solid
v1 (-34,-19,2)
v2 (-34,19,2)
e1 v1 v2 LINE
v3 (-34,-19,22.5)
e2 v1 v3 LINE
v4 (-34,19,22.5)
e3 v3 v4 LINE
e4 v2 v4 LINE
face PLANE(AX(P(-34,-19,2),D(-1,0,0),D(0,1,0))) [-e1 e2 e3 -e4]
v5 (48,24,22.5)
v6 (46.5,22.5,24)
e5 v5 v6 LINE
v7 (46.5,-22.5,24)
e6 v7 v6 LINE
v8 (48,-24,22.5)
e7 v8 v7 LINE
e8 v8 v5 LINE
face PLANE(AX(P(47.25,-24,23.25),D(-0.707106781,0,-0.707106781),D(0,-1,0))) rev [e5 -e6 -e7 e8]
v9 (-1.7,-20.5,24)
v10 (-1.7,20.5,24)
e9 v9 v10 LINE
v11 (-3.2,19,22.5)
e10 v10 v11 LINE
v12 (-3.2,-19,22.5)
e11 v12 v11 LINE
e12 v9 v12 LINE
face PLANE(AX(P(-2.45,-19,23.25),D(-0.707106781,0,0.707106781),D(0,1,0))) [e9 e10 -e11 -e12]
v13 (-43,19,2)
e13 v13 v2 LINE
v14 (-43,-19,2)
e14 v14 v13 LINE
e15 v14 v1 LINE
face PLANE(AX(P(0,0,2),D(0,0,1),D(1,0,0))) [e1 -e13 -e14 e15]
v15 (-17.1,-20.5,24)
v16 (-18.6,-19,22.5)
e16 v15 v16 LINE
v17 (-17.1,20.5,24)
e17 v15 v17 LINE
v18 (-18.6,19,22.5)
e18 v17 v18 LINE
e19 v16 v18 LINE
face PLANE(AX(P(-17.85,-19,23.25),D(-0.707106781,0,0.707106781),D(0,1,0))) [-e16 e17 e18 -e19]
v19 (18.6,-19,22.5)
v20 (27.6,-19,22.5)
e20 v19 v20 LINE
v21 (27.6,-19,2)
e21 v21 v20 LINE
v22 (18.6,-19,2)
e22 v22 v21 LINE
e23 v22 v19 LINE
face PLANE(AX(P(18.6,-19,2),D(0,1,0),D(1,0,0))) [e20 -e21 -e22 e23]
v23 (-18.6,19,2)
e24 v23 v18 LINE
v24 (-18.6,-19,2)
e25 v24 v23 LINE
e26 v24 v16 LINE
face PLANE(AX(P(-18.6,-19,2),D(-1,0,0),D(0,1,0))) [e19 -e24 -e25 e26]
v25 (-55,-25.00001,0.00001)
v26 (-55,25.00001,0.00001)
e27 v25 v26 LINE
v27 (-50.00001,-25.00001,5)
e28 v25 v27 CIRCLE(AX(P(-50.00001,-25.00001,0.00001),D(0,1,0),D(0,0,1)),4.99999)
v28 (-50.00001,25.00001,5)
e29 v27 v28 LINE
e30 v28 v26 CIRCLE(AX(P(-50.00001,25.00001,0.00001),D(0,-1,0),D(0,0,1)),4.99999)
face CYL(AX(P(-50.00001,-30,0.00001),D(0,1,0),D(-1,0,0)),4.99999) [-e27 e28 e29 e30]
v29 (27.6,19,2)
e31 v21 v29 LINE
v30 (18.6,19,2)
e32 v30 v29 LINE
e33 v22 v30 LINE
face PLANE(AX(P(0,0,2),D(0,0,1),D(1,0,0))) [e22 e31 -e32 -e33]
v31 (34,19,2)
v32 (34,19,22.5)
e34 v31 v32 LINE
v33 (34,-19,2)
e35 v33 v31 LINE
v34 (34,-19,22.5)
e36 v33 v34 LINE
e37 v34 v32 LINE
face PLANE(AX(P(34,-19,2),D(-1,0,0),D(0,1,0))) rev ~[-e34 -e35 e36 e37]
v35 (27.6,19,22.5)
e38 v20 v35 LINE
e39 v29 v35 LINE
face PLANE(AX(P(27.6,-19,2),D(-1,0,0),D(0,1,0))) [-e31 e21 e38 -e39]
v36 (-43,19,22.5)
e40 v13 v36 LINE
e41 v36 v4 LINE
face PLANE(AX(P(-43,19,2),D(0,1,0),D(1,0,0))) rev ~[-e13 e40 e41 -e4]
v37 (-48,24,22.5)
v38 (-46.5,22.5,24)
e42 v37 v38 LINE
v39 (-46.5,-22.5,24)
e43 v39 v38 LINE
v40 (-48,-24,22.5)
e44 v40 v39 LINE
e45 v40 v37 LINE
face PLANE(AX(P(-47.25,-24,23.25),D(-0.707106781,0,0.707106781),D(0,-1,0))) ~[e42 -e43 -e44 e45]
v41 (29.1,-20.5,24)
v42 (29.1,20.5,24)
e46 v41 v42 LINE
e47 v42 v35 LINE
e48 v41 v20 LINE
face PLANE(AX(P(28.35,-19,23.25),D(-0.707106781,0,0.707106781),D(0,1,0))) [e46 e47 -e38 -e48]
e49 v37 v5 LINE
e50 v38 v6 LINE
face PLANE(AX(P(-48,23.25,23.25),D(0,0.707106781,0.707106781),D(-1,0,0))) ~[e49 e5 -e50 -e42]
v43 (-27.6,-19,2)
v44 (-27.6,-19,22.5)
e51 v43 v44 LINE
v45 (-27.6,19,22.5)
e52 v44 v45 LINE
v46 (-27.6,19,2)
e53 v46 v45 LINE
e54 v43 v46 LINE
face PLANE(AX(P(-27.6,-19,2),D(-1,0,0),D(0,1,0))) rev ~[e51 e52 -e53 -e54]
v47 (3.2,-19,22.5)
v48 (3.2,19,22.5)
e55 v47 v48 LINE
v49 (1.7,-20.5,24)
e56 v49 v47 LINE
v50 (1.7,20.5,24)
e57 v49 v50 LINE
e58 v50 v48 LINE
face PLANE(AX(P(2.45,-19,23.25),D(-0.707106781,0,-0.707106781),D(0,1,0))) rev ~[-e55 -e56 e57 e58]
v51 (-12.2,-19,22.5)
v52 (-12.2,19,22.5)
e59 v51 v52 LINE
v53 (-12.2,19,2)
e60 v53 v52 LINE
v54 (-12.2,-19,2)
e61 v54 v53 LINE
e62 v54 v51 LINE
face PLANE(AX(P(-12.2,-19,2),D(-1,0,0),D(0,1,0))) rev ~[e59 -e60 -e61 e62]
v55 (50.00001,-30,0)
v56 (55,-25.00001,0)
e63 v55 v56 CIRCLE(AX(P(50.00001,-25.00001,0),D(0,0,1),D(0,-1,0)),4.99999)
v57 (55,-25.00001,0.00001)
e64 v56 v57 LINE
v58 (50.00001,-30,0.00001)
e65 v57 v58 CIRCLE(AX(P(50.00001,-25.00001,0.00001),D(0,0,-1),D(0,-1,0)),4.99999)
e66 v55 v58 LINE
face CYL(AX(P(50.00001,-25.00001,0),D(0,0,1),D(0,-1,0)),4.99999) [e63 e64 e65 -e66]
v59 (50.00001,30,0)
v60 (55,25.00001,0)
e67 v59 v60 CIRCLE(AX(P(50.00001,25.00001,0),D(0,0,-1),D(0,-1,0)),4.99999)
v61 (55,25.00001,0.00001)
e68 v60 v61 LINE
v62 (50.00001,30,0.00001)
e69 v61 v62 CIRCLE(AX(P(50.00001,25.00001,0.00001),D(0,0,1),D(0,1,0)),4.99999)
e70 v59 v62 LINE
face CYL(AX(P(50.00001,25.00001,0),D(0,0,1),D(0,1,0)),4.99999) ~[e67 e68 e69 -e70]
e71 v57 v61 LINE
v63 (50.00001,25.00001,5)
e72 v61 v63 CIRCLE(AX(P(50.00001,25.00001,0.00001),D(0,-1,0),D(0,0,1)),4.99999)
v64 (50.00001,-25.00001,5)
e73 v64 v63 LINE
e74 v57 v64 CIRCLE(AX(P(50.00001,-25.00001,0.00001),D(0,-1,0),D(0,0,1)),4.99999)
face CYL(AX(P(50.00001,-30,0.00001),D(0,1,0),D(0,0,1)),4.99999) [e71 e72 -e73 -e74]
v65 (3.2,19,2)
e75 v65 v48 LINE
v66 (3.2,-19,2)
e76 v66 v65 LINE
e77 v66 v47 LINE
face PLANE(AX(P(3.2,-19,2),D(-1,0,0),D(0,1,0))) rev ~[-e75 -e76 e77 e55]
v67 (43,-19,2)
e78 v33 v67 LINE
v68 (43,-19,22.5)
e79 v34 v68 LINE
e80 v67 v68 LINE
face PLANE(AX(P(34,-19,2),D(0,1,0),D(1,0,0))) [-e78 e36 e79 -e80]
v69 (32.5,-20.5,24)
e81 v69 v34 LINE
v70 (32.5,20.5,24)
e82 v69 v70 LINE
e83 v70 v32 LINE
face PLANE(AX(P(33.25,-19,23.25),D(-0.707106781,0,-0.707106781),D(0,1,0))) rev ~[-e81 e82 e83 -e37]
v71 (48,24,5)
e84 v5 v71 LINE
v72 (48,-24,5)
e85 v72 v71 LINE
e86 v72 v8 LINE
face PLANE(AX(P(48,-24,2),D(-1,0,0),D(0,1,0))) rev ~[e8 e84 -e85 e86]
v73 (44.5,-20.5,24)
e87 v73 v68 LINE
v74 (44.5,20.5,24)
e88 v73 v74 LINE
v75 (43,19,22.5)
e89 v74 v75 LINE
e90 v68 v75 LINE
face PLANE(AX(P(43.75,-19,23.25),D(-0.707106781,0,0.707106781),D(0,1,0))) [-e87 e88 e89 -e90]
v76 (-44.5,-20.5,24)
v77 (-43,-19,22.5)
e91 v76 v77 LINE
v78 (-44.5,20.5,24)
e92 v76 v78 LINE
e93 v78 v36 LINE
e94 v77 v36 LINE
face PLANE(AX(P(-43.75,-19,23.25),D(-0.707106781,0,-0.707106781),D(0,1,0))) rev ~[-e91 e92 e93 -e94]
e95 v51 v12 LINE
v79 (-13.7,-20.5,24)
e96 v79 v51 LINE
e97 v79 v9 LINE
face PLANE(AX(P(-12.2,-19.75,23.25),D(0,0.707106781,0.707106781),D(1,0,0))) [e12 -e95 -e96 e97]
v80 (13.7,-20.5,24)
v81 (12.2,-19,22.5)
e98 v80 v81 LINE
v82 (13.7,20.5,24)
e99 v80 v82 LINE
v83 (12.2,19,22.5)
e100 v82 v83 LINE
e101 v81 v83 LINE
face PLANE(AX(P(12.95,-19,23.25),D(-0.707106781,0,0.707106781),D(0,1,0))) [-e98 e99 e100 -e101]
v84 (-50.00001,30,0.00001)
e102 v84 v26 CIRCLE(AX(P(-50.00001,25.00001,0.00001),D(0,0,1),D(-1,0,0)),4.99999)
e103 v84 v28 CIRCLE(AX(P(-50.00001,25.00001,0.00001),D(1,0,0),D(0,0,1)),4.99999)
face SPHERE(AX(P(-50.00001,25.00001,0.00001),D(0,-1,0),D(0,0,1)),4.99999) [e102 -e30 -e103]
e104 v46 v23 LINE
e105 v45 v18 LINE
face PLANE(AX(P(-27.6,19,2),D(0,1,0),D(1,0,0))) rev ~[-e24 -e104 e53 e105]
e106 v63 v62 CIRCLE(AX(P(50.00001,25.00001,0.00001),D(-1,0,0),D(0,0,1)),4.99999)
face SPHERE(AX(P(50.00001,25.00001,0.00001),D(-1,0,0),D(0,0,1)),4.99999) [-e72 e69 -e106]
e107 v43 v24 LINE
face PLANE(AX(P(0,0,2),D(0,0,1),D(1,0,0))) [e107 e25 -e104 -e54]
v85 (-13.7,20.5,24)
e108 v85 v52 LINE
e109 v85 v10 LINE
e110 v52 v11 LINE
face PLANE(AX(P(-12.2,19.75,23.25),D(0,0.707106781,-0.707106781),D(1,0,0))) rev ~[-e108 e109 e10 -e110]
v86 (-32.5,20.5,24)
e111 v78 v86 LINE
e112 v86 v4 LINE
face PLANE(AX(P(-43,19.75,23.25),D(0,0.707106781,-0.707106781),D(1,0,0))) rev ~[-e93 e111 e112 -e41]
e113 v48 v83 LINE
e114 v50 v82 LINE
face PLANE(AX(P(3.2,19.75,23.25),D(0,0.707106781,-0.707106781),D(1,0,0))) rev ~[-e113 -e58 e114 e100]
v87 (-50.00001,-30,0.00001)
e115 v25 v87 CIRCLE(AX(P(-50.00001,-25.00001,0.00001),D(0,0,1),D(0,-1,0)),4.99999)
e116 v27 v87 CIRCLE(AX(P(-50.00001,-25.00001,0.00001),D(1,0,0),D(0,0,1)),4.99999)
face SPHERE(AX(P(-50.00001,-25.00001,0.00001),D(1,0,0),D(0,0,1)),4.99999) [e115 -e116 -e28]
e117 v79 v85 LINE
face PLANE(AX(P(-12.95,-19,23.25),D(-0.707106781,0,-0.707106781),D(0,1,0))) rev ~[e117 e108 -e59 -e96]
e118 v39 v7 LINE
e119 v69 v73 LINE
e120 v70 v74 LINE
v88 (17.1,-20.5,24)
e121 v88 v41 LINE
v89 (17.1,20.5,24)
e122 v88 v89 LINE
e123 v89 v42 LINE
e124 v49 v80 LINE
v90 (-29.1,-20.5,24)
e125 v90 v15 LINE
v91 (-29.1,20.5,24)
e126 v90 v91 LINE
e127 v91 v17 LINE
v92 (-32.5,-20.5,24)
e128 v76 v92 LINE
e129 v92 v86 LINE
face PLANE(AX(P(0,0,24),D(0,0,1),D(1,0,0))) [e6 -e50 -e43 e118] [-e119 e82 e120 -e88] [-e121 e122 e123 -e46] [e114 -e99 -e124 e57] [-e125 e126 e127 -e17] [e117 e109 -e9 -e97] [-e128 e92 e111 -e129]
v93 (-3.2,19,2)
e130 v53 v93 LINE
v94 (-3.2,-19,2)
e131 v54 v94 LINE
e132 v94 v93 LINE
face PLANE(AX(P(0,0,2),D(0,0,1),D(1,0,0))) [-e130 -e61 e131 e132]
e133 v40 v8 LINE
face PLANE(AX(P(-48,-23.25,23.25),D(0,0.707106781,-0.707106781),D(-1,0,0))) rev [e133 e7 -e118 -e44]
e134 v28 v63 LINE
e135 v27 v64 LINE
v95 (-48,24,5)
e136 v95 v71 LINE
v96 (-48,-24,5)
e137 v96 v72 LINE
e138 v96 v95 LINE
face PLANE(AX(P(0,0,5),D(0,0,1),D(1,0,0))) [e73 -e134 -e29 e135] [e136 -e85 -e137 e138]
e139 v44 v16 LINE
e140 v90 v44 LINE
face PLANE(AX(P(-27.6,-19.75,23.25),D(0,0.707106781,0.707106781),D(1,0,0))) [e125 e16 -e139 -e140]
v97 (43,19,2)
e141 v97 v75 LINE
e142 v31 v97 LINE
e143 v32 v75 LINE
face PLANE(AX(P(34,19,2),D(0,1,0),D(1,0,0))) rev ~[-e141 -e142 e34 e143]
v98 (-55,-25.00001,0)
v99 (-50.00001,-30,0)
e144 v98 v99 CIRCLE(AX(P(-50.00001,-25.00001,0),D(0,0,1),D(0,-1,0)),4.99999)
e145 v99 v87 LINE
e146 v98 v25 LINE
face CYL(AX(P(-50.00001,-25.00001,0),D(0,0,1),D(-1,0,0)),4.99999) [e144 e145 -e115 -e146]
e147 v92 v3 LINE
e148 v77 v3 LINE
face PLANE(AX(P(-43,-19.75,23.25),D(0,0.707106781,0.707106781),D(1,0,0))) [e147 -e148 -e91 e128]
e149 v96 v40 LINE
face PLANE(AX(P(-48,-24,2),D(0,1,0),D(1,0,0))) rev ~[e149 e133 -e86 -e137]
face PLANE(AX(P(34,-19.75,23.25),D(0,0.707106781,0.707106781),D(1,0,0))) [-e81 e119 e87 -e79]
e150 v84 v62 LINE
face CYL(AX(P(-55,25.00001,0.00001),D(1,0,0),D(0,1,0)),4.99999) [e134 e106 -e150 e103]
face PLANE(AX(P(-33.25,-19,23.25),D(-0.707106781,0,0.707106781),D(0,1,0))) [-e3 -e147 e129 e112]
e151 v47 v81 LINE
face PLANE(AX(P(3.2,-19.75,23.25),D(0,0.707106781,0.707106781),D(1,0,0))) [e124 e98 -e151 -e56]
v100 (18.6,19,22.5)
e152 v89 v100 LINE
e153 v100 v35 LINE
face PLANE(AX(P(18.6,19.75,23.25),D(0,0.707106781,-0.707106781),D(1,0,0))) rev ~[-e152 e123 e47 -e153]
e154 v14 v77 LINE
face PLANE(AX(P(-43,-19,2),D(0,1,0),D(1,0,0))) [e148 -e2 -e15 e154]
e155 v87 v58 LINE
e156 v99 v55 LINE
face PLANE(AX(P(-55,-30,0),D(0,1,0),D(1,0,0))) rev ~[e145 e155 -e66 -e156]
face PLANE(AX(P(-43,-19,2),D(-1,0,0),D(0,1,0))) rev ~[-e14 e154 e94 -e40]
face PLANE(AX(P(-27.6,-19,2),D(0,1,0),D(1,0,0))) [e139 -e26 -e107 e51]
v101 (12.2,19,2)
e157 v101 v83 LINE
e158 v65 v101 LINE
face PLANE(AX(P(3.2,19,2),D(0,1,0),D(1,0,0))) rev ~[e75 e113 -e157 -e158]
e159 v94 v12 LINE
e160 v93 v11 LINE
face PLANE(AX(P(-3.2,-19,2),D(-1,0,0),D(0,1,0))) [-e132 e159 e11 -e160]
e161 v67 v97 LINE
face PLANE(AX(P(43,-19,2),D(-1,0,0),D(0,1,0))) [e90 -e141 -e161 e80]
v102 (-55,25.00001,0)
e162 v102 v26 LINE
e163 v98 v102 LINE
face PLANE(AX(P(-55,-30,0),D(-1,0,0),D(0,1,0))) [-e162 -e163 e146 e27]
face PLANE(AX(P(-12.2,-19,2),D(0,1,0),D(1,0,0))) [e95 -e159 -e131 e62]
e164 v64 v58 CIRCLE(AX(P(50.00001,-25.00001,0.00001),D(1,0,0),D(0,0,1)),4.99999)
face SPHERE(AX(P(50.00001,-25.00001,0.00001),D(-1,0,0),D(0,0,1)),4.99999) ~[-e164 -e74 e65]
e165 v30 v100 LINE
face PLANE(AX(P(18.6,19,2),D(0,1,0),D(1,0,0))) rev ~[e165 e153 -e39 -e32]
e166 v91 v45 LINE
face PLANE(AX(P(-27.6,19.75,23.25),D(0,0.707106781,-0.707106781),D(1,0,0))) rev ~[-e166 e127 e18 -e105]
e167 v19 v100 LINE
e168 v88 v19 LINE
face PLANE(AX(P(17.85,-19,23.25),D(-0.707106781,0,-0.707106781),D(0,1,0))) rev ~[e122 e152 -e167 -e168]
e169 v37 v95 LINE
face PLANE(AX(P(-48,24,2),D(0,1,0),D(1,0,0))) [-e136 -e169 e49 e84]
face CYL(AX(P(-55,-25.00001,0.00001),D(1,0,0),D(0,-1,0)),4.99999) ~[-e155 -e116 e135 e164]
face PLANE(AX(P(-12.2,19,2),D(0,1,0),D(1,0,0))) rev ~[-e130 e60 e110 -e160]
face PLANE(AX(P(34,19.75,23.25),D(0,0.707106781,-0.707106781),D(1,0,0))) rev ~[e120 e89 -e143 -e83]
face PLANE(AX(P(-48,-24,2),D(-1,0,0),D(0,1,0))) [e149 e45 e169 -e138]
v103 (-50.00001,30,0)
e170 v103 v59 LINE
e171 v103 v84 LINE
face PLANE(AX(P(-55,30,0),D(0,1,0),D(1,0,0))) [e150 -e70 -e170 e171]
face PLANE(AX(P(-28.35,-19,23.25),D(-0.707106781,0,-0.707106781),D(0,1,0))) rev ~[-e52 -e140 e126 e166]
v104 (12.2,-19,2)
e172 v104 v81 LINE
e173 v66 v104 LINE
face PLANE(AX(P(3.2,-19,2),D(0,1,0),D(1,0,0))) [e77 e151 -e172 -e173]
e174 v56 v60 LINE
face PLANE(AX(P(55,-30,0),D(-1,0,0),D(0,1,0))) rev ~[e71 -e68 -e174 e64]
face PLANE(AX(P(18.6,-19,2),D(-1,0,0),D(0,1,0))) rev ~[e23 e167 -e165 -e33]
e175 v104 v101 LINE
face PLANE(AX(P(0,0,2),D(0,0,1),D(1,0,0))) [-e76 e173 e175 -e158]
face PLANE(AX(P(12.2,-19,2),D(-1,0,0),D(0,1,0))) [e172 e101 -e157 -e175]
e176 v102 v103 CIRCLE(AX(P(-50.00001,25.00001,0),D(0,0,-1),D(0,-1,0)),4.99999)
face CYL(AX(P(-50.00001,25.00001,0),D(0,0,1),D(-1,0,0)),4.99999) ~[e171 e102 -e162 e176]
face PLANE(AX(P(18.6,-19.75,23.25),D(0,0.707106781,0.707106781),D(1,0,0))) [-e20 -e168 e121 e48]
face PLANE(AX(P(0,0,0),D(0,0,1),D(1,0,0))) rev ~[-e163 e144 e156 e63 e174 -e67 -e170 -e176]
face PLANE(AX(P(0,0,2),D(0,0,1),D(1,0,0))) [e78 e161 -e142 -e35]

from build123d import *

# Parameters (mm, degrees)
F0_W     = 96
F0_H     = 48
F1_DEPTH = 2
F2_W     = 96
F2_H     = 48
F2_W_2   = 9
F2_H_2   = 38
F3_DEPTH = 22
F0_W_2   = 110
F0_H_2   = 60
F4_DEPTH = 5
F5_R     = 4.99999
F6_SIZE  = 1.5


# Not quite as in the source:
# - a fillet or chamfer is up to 0.001 mm smaller than in the source, because OpenCascade refuses the exact size
# - a feature names something its author has since deleted; it is built from what else it names


with BuildPart() as f1:
    # F0 (on Top) → F1 (new body)
    with BuildSketch(Plane.XY):
        Rectangle(F0_W, F0_H)
    extrude(amount=F1_DEPTH)

    # F2 (on face) → F3 (join)
    with BuildSketch(Plane.XY.offset(2)):
        Rectangle(F2_W, F2_H)
        with Locations((-38.5, 0)):
            Rectangle(F2_W_2, F2_H_2, mode=Mode.SUBTRACT)
        with Locations((-23.1, 0)):
            Rectangle(F2_W_2, F2_H_2, mode=Mode.SUBTRACT)
        with Locations((-7.7, 0)):
            Rectangle(F2_W_2, F2_H_2, mode=Mode.SUBTRACT)
        with Locations((7.7, 0)):
            Rectangle(F2_W_2, F2_H_2, mode=Mode.SUBTRACT)
        with Locations((23.1, 0)):
            Rectangle(F2_W_2, F2_H_2, mode=Mode.SUBTRACT)
        with Locations((38.5, 0)):
            Rectangle(F2_W_2, F2_H_2, mode=Mode.SUBTRACT)
    extrude(amount=F3_DEPTH)

    # F0 (on Top) → F4 (join)
    with BuildSketch(Plane.XY):
        Rectangle(F0_W_2, F0_H_2)
        Rectangle(F0_W, F0_H, mode=Mode.SUBTRACT)
    extrude(amount=F4_DEPTH)

    # F5 (radius 5 in the source; OpenCascade refuses exactly that, so slightly less here)
    f5_edges = [f1.edges().sort_by_distance(p)[0] for p in [
        (0, -30, 5),
        (-55, 0, 5),
        (0, 30, 5),
        (55, 0, 5),
        (55, -30, 2.5),
        (55, 30, 2.5),
        (-55, -30, 2.5),
        (-55, 30, 2.5),
    ]]
    fillet(f5_edges, radius=F5_R)

    # F6
    f6_edges = [f1.edges().sort_by_distance(p)[0] for p in [
        (0, -24, 24),
        (-48, 0, 24),
        (0, 24, 24),
        (48, 0, 24),
        (-43, 0, 24),
        (-34, 0, 24),
        (-38.5, -19, 24),
        (-38.5, 19, 24),
        (-23.1, -19, 24),
        (-18.6, 0, 24),
        (-27.6, 0, 24),
        (-23.1, 19, 24),
        (-7.7, 19, 24),
        (-12.2, 0, 24),
        (-7.7, -19, 24),
        (-3.2, 0, 24),
        (3.2, 0, 24),
        (12.2, 0, 24),
        (7.7, -19, 24),
        (7.7, 19, 24),
        (18.6, 0, 24),
        (23.1, 19, 24),
        (27.6, 0, 24),
        (23.1, -19, 24),
        (38.5, -19, 24),
        (34, 0, 24),
        (43, 0, 24),
        (38.5, 19, 24),
    ]]
    chamfer(f6_edges, length=F6_SIZE)


solid = f1.part
